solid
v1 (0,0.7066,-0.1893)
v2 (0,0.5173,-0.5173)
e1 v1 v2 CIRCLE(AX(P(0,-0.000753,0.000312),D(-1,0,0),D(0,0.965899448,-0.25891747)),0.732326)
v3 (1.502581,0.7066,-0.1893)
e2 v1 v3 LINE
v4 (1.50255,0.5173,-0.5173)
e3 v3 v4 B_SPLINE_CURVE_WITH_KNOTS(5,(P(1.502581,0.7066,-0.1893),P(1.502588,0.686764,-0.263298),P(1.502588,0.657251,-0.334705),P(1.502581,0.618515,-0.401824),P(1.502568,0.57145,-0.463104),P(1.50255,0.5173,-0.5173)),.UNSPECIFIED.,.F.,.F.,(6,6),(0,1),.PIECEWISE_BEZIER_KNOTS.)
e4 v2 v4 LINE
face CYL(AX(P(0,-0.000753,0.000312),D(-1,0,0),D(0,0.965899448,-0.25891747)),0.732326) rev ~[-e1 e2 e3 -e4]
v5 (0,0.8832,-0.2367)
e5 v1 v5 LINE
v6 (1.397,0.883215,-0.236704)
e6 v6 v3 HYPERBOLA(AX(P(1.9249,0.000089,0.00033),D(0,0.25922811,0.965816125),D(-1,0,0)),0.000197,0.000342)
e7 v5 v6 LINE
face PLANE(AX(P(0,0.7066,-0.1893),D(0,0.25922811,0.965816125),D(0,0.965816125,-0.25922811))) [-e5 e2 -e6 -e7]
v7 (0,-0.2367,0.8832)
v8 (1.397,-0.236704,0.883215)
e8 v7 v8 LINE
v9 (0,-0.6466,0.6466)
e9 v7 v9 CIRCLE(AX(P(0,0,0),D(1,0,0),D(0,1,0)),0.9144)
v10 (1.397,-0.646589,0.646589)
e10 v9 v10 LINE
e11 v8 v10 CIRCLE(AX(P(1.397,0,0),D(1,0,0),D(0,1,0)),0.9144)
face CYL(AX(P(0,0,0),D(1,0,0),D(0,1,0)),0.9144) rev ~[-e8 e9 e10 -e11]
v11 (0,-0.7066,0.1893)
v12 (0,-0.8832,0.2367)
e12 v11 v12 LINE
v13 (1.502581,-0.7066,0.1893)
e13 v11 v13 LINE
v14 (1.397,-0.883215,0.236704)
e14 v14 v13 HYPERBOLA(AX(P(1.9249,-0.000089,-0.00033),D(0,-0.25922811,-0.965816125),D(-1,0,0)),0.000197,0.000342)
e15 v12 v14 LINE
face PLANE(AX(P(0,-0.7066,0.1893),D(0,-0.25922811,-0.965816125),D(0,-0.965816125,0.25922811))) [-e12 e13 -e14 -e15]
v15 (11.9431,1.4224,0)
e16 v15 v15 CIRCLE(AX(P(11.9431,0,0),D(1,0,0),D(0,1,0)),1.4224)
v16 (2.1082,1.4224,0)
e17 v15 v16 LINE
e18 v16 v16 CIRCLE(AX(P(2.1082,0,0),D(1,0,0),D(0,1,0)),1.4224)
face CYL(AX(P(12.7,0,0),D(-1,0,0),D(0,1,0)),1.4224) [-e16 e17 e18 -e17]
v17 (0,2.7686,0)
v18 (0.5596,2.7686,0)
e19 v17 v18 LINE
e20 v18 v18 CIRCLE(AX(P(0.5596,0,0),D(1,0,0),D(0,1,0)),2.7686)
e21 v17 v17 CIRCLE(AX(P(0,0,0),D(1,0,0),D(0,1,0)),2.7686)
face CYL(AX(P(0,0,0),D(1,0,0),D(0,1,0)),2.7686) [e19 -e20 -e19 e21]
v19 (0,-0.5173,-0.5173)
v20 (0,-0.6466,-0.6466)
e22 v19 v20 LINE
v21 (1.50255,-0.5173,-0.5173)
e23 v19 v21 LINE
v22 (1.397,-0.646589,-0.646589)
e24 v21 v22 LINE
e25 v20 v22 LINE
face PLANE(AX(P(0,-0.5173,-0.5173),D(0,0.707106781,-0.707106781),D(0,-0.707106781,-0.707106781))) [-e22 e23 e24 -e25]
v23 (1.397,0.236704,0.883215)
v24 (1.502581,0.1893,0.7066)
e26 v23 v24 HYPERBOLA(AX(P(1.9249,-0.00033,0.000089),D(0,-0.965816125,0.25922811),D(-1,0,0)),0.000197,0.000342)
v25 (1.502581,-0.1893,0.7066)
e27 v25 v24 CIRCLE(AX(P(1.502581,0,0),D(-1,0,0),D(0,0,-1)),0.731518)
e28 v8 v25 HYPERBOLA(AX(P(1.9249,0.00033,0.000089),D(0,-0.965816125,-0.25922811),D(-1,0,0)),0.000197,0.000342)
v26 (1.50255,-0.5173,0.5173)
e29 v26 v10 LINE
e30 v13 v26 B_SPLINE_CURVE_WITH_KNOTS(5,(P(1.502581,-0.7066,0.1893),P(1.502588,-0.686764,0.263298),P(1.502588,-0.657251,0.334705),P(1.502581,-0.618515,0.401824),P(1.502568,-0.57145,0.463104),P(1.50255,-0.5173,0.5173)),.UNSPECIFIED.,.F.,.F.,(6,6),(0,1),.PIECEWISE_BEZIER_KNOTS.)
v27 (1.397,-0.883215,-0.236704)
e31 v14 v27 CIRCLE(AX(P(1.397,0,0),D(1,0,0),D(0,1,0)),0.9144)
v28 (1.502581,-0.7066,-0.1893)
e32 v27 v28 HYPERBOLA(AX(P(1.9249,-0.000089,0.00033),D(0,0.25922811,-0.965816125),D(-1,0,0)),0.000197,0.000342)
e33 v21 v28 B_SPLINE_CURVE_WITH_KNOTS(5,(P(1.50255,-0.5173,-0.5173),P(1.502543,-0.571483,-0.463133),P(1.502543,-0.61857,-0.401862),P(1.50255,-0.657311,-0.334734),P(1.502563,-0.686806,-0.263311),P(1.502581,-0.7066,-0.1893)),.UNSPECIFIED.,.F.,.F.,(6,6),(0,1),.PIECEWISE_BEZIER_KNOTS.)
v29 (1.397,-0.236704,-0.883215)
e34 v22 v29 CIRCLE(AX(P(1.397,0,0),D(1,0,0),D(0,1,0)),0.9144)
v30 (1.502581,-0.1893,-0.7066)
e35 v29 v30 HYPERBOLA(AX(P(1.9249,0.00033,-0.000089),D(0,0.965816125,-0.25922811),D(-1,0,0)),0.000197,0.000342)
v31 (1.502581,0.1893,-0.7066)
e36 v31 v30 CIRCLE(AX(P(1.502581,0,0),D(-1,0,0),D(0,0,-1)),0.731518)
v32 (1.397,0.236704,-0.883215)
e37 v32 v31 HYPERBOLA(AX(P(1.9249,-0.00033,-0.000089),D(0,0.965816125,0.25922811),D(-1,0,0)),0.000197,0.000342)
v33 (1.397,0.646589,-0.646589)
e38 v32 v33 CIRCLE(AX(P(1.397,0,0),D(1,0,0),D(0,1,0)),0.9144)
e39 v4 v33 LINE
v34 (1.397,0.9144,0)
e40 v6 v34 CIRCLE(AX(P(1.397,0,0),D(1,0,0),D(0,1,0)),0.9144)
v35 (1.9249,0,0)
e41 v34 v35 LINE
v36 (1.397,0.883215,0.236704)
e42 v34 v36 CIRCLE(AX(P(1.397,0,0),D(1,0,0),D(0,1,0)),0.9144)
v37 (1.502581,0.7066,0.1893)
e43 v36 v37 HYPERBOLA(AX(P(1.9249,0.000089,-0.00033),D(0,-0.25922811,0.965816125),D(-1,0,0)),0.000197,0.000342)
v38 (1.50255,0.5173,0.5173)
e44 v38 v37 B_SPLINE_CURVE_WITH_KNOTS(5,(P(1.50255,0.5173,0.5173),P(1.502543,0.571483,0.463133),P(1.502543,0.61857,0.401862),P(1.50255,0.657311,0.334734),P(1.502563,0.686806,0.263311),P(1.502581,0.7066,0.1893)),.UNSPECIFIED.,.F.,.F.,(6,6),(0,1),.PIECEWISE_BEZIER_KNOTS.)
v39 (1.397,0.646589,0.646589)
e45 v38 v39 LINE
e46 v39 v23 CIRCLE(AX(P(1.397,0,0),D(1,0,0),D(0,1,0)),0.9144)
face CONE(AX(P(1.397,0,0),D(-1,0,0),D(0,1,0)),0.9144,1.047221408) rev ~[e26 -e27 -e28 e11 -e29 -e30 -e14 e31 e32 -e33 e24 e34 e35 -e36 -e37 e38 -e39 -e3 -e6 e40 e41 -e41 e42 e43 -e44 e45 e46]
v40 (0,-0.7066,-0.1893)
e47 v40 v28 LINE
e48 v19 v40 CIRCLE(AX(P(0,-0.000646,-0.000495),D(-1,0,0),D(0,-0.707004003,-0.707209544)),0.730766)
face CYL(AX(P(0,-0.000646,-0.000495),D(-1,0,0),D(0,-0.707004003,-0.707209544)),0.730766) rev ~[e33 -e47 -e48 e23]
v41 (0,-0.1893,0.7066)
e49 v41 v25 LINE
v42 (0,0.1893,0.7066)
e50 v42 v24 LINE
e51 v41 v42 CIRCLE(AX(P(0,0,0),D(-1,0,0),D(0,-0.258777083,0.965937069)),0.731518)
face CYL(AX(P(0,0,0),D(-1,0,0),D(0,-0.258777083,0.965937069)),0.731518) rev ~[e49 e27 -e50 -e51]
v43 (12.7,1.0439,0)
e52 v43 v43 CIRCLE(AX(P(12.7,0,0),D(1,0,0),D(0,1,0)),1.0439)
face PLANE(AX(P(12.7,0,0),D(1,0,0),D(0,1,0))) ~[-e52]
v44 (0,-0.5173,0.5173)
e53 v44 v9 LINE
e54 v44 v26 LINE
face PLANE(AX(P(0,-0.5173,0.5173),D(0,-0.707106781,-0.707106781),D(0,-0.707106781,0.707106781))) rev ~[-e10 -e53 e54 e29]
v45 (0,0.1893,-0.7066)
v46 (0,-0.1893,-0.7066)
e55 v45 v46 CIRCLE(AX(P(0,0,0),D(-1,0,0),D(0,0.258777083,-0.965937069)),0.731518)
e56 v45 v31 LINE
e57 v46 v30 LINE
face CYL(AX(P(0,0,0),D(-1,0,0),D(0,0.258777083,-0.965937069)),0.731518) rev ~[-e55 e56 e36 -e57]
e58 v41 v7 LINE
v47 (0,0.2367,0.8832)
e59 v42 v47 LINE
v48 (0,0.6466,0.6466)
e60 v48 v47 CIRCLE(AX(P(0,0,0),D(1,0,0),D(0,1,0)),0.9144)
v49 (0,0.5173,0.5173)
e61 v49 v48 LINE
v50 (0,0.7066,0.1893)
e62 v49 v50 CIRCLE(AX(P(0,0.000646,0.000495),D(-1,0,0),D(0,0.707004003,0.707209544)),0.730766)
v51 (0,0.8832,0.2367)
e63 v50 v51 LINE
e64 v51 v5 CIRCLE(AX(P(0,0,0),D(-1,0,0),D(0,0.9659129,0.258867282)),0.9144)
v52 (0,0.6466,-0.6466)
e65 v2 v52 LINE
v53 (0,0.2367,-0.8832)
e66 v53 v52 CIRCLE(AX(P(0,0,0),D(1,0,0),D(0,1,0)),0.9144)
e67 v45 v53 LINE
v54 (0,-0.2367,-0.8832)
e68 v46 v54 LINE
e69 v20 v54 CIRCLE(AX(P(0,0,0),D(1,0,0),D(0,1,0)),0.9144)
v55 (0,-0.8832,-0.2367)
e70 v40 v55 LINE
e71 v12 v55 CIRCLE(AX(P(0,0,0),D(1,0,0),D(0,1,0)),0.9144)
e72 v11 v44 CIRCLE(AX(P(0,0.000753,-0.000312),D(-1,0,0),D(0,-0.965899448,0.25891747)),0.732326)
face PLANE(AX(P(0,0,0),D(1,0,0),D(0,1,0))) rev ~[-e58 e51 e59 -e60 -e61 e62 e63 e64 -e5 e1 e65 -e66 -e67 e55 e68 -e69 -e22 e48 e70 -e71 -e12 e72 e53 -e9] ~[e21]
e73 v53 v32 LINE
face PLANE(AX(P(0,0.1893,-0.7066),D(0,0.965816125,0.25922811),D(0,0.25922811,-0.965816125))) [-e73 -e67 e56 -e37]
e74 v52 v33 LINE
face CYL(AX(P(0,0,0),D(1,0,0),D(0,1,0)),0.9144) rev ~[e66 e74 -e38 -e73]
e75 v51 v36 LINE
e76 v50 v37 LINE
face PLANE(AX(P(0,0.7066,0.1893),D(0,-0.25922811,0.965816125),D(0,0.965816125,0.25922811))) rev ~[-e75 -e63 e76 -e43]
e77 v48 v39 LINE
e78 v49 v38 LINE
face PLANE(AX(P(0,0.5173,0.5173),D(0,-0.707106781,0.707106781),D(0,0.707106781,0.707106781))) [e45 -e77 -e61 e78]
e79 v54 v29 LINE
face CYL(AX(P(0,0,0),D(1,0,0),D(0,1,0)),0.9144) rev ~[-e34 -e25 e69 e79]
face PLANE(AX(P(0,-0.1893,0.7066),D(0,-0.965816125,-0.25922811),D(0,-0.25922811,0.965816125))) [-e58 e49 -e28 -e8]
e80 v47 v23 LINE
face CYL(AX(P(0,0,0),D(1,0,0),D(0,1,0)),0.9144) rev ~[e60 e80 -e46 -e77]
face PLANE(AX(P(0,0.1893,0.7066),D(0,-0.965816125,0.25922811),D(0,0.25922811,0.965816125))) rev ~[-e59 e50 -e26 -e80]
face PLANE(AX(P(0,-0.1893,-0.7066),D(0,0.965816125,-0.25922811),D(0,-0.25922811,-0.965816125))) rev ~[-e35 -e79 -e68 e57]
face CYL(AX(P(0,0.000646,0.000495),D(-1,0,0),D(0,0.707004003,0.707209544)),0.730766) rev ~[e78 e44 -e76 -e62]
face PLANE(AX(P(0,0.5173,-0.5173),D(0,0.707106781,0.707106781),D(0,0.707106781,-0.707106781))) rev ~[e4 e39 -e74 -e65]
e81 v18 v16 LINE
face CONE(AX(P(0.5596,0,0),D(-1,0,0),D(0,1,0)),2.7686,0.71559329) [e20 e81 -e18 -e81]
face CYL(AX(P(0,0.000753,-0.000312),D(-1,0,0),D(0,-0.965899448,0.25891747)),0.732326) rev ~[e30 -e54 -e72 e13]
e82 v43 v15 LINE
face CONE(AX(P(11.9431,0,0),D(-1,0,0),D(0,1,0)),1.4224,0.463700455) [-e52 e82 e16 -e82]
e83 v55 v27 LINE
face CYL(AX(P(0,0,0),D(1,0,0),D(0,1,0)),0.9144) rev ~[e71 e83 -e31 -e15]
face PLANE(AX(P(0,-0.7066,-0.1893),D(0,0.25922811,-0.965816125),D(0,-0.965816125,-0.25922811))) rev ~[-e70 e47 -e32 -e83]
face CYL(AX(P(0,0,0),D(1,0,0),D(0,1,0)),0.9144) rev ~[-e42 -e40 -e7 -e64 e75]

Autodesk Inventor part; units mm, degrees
ref_plane "YZ Plane" through (0, 0, 0) normal (1, 0, 0) x (0, 1, 0)
ref_plane "XZ Plane" through (0, 0, 0) normal (0, 1, 0) x (-1, 0, 0)
sketch "Sketch1" plane through (0, 0, 0) normal (0, 0, 1) x (1, 0, 0)
  line L0 (12.7, 0) -> (12.7, 1.4224)
  line L1 (12.7, 1.4224) -> (2.1082, 1.4224)
  line L2 (0, 2.7686) -> (0, 0.9144)
  line L3 (0, 0.9144) -> (1.397, 0.9144)
  line L4 (1.397, 0.9144) -> (1.9249, 0)
  line L5 (1.9249, 0) -> (12.7, 0)
  line L6 (0, 2.7686) -> (0.5596, 2.7686)
  line L7 (0.5596, 2.7686) -> (2.1082, 1.4224)
  line L8 (-2.54, 0) -> (15.24, 0) projected
  line L9 (0, -0.5537) -> (0, 3.3223) projected
  dimension "d0" = 12.7
  dimension "d1" = 1.397
  dimension "d2" = 2.8448
  dimension "d3" = 2.1082
  dimension "d4" = 41
  dimension "d5" = 1.8288
  dimension "d6" = 60
  dimension "d7" = 5.5372
revolve "Body" add sketch "Sketch1" angle 360 about axis through (1.9249, 0, 0) along (1, 0, 0) contours L5 L4 L3 L2 L6 L7 L1 L0
sketch "Sketch2" plane through (0, 0, 0) normal (-1, 0, 0) x (0, 0, 1)
  circle A0 centre (0, 0) radius 2.7686 projected
  circle A1 centre (0, 0) radius 0.9144 projected
  line L0 (0.7066, 0.1893) -> (0.8832, 0.2367)
  line L1 (0.7066, -0.1893) -> (0.8832, -0.2367)
  arc A2 (0.7066, -0.1893) -> (0.7066, 0.1893) centre (0, 0) ccw
  arc A3 (0.8832, -0.2367) -> (0.8832, 0.2367) centre (0, 0) ccw
  line L2 (0, -3.876) -> (0, 3.876) projected
  line L3 (-3.876, 0) -> (3.876, 0) projected
  line L4 (0.7066, 0.1893) -> (0, 0) construction
  line L5 (0, 0) -> (0.7066, -0.1893) construction
  line L6 (0.1893, 0.7066) -> (0.2367, 0.8832)
  line L7 (0.5173, 0.5173) -> (0.6466, 0.6466)
  arc A4 (0.5173, 0.5173) -> (0.1893, 0.7066) centre (0, 0) ccw
  arc A5 (0.6466, 0.6466) -> (0.2367, 0.8832) centre (0, 0) ccw
  line L8 (-0.5173, 0.5173) -> (-0.6466, 0.6466)
  line L9 (-0.1893, 0.7066) -> (-0.2367, 0.8832)
  arc A6 (-0.1893, 0.7066) -> (-0.5173, 0.5173) centre (0, 0) ccw
  arc A7 (-0.2367, 0.8832) -> (-0.6466, 0.6466) centre (0, 0) ccw
  line L10 (-0.7066, -0.1893) -> (-0.8832, -0.2367)
  line L11 (-0.7066, 0.1893) -> (-0.8832, 0.2367)
  arc A8 (-0.7066, 0.1893) -> (-0.7066, -0.1893) centre (0, 0) ccw
  arc A9 (-0.8832, 0.2367) -> (-0.8832, -0.2367) centre (0, 0) ccw
  line L12 (-0.1893, -0.7066) -> (-0.2367, -0.8832)
  line L13 (-0.5173, -0.5173) -> (-0.6466, -0.6466)
  arc A10 (-0.5173, -0.5173) -> (-0.1893, -0.7066) centre (0, 0) ccw
  arc A11 (-0.6466, -0.6466) -> (-0.2367, -0.8832) centre (0, 0) ccw
  line L14 (0.5173, -0.5173) -> (0.6466, -0.6466)
  line L15 (0.1893, -0.7066) -> (0.2367, -0.8832)
  arc A12 (0.1893, -0.7066) -> (0.5173, -0.5173) centre (0, 0) ccw
  arc A13 (0.2367, -0.8832) -> (0.6466, -0.6466) centre (0, 0) ccw
  dimension "d8" = 1.463
  dimension "d9" = 1.8288
  dimension "d10" = 15
  dimension "d11" = 15
  dimension "d22" = 360
extrude "Slot" add sketch "Sketch2" against normal up to next contours L3 A2 L0 A1 | A1 L1 A2 L3 | L3 A8 L10 A1 | A1 L11 A8 L3 | A1 L7 A4 L6 | L9 A6 L8 A1 | A1 L13 A10 L12 | L15 A12 L14 A1
thread "Thread" size "4-40 UNC" class "2A" standard "ANSI Unified Screw Threads" length 9.0043
chamfer "Chamfer1" distance 0.3785 distance2 0.7569 1 edges at (12.7, -1.4224, 0) measured on face at (12.7, -0.1681, 0.4433)
ref_plane "Work Plane1" through (66.6877, 0, 0) normal (0, 0, -1) x (1, 0, 0)
equation "\"d0\" = NLG"
equation "\"d1\" = INTI"
equation "\"d2\" = GD"
equation "\"d3\" = KOH"
equation "\"d4\" = 0.5 * SEWI"
equation "\"d5\" = SW"
equation "\"d7\" = KOD"
equation "\"d8\" = 0.8 * SW"
equation "\"d9\" = SW"
equation "\"d15\" = GEL"
equation "\"d17\" = -0.5 * SPD + 0.5 * GD"
equation "\"d18\" = GUL"
equation "\"NLG\" = 12.7"
equation "\"SW\" = 1.8288"
equation "\"INTI\" = 1.397"
equation "\"GEL\" = 9.0043"
equation "\"KOH\" = 2.1082"
equation "\"KOD\" = 5.5372"
equation "\"GUL\" = 0.75692"
equation "\"SPD\" = 2.08788"
equation "\"GD\" = NND"
equation "\"SEWI\" = 82deg"
equation "\"TOA\" = 30deg"
equation "\"GD1\" = SPD"
equation "\"EPV\" = 3.74448"
equation "\"THREADDIA\" = 2.8448"
equation "\"BDM\" = NND"
equation "\"NND\" = 2.8448"
equation "\"GAL\" = 1.5875"
equation "\"E0\" = 1.155 * SW"
properties part number "ANSI B18.3 - 4-40 UNC x 0.5, SSFCHCSI" material "Steel, Mild"
